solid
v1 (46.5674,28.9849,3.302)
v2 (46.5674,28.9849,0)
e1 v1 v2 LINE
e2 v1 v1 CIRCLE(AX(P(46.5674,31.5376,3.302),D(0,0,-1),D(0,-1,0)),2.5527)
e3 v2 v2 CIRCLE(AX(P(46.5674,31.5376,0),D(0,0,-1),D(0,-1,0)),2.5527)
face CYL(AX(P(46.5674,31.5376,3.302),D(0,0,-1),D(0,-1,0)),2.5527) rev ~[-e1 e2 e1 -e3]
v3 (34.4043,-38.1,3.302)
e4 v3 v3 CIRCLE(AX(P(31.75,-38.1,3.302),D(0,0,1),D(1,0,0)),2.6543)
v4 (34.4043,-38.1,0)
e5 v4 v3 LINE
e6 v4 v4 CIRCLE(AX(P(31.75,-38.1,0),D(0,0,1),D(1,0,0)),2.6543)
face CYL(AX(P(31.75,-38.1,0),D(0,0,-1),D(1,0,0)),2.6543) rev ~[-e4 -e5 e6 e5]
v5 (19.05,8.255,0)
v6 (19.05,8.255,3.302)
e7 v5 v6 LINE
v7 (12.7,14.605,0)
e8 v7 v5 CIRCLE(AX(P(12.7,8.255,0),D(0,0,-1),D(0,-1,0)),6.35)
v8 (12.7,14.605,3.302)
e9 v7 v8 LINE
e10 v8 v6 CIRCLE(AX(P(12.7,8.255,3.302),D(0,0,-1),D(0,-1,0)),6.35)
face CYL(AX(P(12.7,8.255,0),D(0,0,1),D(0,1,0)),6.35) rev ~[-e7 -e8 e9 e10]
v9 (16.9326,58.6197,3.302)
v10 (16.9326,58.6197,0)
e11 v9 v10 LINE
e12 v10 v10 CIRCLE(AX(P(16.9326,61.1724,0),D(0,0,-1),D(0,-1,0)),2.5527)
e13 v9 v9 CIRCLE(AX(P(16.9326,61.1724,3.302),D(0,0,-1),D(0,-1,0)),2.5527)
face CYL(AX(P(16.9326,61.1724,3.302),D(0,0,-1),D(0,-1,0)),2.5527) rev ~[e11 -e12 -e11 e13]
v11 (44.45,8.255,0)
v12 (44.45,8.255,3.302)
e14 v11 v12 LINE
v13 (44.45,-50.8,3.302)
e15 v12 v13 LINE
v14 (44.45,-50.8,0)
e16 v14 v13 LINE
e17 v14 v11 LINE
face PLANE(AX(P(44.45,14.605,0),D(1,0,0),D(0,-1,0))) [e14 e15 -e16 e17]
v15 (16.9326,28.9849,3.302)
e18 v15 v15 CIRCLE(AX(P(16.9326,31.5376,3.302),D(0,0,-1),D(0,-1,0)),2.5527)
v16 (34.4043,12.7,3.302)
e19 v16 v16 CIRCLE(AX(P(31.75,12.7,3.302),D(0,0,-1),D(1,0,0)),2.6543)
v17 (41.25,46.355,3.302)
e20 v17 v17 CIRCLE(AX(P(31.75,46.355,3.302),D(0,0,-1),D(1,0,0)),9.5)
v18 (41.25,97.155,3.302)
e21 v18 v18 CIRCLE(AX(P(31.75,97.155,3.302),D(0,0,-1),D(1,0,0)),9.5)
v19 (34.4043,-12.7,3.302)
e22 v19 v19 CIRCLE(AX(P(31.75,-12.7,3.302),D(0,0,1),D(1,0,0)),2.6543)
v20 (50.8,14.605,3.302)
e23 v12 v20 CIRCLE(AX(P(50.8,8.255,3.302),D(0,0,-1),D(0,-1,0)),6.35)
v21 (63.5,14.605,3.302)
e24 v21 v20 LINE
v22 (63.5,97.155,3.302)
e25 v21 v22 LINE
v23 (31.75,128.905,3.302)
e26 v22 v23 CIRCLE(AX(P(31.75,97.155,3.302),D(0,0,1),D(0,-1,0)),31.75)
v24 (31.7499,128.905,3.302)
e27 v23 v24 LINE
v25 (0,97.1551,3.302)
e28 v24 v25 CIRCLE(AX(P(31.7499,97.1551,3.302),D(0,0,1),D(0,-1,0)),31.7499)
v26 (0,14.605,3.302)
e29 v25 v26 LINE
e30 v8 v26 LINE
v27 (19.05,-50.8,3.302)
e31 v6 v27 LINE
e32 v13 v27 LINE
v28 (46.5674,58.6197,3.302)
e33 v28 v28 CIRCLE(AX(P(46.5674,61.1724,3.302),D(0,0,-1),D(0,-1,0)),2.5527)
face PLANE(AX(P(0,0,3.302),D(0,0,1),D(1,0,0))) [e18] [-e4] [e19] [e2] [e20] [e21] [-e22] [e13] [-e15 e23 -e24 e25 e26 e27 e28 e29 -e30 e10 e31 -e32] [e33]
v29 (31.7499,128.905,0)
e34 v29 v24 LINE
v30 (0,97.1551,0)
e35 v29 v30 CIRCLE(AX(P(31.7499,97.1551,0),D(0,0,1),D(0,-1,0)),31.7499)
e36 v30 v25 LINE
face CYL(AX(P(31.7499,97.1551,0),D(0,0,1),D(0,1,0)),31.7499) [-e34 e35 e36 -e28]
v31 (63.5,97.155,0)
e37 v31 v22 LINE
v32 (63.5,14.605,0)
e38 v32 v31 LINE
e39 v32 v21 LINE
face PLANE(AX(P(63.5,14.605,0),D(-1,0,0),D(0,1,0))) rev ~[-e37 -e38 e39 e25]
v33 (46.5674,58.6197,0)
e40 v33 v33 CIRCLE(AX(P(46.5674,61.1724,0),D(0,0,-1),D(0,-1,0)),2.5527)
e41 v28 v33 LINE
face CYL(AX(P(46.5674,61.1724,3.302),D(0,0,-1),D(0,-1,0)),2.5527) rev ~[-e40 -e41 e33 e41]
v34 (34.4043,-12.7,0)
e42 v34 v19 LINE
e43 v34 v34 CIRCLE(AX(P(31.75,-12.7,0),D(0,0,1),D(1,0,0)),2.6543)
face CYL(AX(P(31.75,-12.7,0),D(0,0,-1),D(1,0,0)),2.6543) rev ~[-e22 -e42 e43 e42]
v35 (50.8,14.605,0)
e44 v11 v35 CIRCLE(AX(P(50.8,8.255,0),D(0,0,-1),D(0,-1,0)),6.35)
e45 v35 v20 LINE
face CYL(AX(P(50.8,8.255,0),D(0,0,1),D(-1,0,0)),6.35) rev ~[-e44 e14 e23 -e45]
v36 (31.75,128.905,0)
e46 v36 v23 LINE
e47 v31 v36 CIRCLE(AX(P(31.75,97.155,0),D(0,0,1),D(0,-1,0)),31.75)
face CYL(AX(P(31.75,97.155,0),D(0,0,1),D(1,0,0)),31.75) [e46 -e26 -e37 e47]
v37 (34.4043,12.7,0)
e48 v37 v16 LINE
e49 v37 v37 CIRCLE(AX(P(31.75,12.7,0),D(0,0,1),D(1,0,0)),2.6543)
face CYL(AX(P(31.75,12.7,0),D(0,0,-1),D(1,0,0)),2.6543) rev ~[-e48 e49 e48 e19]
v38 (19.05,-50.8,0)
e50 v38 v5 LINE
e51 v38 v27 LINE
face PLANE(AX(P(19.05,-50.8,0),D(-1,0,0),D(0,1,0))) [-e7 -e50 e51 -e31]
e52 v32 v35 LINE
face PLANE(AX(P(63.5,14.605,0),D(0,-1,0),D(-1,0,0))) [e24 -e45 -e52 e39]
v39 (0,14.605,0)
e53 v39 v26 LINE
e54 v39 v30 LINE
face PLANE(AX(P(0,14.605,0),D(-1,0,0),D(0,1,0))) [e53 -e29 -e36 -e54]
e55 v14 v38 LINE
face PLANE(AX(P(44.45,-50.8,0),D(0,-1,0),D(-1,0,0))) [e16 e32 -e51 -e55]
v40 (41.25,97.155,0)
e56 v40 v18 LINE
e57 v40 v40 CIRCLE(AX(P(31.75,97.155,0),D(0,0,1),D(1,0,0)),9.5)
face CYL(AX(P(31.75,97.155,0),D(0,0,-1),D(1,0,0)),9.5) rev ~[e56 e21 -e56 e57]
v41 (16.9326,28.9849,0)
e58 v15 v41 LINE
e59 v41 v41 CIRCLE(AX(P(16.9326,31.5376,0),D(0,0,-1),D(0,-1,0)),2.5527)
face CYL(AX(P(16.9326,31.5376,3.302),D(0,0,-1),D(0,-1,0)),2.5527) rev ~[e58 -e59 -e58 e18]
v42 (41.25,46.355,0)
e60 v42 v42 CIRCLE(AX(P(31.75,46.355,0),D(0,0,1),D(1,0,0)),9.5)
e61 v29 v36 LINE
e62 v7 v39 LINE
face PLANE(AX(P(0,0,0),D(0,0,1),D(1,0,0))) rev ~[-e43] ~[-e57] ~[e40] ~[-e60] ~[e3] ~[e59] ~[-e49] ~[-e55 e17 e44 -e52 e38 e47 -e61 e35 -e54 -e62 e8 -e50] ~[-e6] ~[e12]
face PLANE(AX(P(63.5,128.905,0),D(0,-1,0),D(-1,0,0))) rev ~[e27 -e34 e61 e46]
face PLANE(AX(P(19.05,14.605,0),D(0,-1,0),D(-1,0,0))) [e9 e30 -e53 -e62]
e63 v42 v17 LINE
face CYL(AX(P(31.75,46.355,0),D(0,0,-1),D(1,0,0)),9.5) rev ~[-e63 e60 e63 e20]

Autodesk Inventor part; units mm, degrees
ref_plane "YZ Plane" through (0, 0, 0) normal (1, 0, 0) x (0, 1, 0)
ref_plane "XZ Plane" through (0, 0, 0) normal (0, 1, 0) x (-1, 0, 0)
ref_plane "XY Plane" through (0, 0, 0) normal (0, 0, 1) x (1, 0, 0)
sketch "Sketch1" plane through (0, 0, 0) normal (0, 0, 1) x (1, 0, 0)
  line L0 (63.5, 1.905) -> (63.5, 128.905)
  line L1 (63.5, 128.905) -> (0, 128.905)
  line L2 (0, 128.905) -> (0, 41.0985)
  circle A0 centre (31.75, 97.155) radius 9.5
  circle A1 centre (31.75, 46.355) radius 9.5
  circle A2 centre (31.75, 12.7) radius 2.6543
  line L3 (19.05, 0) -> (19.05, 14.605)
  line L4 (19.05, 25.4) -> (44.45, 25.4)
  line L5 (44.45, 25.4) -> (44.45, 0)
  line L6 (31.75, 0) -> (31.75, 128.905)
  circle A3 centre (31.75, -12.7) radius 2.6543
  circle A4 centre (31.75, -38.1) radius 2.6543
  line L7 (44.45, 0) -> (44.45, -50.8)
  line L8 (44.45, -50.8) -> (19.05, -50.8)
  line L9 (19.05, -50.8) -> (19.05, 0)
  line L10 (0, 41.0985) -> (0, 27.305)
  line L11 (63.5, 14.605) -> (0, 14.605)
  line L12 (0, 14.605) -> (0, 27.305)
  point P0 (0, 0)
  point P1 (63.5, 27.305)
  point P2 (44.45, 14.605)
  point P3 (31.75, -50.8)
  dimension "d0" = 63.5
  dimension "d1" = 127
  dimension "d3" = 116.205
  dimension "d4" = 31.75
  dimension "d5" = 82.55
  dimension "d12" = 19
  dimension "d13" = 19
  dimension "d14" = 5.3086
  dimension "d29" = 25.4
  dimension "d30" = 25.4
  dimension "d31" = 25.4
  dimension "d32" = 25.4
  dimension "d33" = 50.8
  dimension "d36" = 12.7
extrude "Extrusion1" add sketch "Sketch1" along normal blind 3.302 contours L11 L5 L4 L6 A1 A0 L1 L0 | L11 A2 L6 L4 L5 | L5 L7 L8 L9 L3 L11 A2 | L6 A0 A1 A2 L11 L12 L10 L2 L1
fillet "Fillet1" radius 31.75 1 edges at (63.5, 128.905, 1.651)
fillet "Fillet2" radius 31.75 1 edges at (0, 128.905, 1.651)
sketch "Sketch3" plane through (0, 0, 3.302) normal (0, 0, 1) x (1, 0, 0)
  circle A0 centre (31.75, 46.355) radius 9.5 projected
  circle A1 centre (31.75, 46.355) radius 20.955
  line L0 (31.75, 46.355) -> (4.2793, 73.8257)
  line L1 (4.2793, 73.8257) -> (54.0042, 24.1008)
  line L2 (31.75, 46.355) -> (57.6977, 72.3027)
  line L3 (31.75, 46.355) -> (13.6103, 28.2153)
  line L4 (31.75, 46.355) -> (57.4034, 46.355) construction
  point P0 (0, 0)
  point P1 (46.5674, 61.1724)
  point P2 (46.5674, 31.5376)
  point P3 (16.9326, 61.1724)
  point P4 (16.9326, 31.5376)
  dimension "d16" = 41.91
  dimension "d28" = 135
hole "Hole1" at (46.5674, 61.1724, 3.302) at (46.5674, 31.5376, 3.302) at (16.9326, 61.1724, 3.302) at (16.9326, 31.5376, 3.302) direction (0, 0, -1) diameter 5.1054 depth 16.256 tip angle 118 clearance for "Flat Head Machine Screw (82)" size "#10" standard "Ansi Unified Screw Threads"
fillet "Fillet5" radius 6.35 1 edges at (19.05, 14.605, 1.651)
fillet "Fillet6" radius 6.35 1 edges at (44.45, 14.605, 1.651)
equation "\"d13\" = d12"
properties part number "wrist plate 2"
